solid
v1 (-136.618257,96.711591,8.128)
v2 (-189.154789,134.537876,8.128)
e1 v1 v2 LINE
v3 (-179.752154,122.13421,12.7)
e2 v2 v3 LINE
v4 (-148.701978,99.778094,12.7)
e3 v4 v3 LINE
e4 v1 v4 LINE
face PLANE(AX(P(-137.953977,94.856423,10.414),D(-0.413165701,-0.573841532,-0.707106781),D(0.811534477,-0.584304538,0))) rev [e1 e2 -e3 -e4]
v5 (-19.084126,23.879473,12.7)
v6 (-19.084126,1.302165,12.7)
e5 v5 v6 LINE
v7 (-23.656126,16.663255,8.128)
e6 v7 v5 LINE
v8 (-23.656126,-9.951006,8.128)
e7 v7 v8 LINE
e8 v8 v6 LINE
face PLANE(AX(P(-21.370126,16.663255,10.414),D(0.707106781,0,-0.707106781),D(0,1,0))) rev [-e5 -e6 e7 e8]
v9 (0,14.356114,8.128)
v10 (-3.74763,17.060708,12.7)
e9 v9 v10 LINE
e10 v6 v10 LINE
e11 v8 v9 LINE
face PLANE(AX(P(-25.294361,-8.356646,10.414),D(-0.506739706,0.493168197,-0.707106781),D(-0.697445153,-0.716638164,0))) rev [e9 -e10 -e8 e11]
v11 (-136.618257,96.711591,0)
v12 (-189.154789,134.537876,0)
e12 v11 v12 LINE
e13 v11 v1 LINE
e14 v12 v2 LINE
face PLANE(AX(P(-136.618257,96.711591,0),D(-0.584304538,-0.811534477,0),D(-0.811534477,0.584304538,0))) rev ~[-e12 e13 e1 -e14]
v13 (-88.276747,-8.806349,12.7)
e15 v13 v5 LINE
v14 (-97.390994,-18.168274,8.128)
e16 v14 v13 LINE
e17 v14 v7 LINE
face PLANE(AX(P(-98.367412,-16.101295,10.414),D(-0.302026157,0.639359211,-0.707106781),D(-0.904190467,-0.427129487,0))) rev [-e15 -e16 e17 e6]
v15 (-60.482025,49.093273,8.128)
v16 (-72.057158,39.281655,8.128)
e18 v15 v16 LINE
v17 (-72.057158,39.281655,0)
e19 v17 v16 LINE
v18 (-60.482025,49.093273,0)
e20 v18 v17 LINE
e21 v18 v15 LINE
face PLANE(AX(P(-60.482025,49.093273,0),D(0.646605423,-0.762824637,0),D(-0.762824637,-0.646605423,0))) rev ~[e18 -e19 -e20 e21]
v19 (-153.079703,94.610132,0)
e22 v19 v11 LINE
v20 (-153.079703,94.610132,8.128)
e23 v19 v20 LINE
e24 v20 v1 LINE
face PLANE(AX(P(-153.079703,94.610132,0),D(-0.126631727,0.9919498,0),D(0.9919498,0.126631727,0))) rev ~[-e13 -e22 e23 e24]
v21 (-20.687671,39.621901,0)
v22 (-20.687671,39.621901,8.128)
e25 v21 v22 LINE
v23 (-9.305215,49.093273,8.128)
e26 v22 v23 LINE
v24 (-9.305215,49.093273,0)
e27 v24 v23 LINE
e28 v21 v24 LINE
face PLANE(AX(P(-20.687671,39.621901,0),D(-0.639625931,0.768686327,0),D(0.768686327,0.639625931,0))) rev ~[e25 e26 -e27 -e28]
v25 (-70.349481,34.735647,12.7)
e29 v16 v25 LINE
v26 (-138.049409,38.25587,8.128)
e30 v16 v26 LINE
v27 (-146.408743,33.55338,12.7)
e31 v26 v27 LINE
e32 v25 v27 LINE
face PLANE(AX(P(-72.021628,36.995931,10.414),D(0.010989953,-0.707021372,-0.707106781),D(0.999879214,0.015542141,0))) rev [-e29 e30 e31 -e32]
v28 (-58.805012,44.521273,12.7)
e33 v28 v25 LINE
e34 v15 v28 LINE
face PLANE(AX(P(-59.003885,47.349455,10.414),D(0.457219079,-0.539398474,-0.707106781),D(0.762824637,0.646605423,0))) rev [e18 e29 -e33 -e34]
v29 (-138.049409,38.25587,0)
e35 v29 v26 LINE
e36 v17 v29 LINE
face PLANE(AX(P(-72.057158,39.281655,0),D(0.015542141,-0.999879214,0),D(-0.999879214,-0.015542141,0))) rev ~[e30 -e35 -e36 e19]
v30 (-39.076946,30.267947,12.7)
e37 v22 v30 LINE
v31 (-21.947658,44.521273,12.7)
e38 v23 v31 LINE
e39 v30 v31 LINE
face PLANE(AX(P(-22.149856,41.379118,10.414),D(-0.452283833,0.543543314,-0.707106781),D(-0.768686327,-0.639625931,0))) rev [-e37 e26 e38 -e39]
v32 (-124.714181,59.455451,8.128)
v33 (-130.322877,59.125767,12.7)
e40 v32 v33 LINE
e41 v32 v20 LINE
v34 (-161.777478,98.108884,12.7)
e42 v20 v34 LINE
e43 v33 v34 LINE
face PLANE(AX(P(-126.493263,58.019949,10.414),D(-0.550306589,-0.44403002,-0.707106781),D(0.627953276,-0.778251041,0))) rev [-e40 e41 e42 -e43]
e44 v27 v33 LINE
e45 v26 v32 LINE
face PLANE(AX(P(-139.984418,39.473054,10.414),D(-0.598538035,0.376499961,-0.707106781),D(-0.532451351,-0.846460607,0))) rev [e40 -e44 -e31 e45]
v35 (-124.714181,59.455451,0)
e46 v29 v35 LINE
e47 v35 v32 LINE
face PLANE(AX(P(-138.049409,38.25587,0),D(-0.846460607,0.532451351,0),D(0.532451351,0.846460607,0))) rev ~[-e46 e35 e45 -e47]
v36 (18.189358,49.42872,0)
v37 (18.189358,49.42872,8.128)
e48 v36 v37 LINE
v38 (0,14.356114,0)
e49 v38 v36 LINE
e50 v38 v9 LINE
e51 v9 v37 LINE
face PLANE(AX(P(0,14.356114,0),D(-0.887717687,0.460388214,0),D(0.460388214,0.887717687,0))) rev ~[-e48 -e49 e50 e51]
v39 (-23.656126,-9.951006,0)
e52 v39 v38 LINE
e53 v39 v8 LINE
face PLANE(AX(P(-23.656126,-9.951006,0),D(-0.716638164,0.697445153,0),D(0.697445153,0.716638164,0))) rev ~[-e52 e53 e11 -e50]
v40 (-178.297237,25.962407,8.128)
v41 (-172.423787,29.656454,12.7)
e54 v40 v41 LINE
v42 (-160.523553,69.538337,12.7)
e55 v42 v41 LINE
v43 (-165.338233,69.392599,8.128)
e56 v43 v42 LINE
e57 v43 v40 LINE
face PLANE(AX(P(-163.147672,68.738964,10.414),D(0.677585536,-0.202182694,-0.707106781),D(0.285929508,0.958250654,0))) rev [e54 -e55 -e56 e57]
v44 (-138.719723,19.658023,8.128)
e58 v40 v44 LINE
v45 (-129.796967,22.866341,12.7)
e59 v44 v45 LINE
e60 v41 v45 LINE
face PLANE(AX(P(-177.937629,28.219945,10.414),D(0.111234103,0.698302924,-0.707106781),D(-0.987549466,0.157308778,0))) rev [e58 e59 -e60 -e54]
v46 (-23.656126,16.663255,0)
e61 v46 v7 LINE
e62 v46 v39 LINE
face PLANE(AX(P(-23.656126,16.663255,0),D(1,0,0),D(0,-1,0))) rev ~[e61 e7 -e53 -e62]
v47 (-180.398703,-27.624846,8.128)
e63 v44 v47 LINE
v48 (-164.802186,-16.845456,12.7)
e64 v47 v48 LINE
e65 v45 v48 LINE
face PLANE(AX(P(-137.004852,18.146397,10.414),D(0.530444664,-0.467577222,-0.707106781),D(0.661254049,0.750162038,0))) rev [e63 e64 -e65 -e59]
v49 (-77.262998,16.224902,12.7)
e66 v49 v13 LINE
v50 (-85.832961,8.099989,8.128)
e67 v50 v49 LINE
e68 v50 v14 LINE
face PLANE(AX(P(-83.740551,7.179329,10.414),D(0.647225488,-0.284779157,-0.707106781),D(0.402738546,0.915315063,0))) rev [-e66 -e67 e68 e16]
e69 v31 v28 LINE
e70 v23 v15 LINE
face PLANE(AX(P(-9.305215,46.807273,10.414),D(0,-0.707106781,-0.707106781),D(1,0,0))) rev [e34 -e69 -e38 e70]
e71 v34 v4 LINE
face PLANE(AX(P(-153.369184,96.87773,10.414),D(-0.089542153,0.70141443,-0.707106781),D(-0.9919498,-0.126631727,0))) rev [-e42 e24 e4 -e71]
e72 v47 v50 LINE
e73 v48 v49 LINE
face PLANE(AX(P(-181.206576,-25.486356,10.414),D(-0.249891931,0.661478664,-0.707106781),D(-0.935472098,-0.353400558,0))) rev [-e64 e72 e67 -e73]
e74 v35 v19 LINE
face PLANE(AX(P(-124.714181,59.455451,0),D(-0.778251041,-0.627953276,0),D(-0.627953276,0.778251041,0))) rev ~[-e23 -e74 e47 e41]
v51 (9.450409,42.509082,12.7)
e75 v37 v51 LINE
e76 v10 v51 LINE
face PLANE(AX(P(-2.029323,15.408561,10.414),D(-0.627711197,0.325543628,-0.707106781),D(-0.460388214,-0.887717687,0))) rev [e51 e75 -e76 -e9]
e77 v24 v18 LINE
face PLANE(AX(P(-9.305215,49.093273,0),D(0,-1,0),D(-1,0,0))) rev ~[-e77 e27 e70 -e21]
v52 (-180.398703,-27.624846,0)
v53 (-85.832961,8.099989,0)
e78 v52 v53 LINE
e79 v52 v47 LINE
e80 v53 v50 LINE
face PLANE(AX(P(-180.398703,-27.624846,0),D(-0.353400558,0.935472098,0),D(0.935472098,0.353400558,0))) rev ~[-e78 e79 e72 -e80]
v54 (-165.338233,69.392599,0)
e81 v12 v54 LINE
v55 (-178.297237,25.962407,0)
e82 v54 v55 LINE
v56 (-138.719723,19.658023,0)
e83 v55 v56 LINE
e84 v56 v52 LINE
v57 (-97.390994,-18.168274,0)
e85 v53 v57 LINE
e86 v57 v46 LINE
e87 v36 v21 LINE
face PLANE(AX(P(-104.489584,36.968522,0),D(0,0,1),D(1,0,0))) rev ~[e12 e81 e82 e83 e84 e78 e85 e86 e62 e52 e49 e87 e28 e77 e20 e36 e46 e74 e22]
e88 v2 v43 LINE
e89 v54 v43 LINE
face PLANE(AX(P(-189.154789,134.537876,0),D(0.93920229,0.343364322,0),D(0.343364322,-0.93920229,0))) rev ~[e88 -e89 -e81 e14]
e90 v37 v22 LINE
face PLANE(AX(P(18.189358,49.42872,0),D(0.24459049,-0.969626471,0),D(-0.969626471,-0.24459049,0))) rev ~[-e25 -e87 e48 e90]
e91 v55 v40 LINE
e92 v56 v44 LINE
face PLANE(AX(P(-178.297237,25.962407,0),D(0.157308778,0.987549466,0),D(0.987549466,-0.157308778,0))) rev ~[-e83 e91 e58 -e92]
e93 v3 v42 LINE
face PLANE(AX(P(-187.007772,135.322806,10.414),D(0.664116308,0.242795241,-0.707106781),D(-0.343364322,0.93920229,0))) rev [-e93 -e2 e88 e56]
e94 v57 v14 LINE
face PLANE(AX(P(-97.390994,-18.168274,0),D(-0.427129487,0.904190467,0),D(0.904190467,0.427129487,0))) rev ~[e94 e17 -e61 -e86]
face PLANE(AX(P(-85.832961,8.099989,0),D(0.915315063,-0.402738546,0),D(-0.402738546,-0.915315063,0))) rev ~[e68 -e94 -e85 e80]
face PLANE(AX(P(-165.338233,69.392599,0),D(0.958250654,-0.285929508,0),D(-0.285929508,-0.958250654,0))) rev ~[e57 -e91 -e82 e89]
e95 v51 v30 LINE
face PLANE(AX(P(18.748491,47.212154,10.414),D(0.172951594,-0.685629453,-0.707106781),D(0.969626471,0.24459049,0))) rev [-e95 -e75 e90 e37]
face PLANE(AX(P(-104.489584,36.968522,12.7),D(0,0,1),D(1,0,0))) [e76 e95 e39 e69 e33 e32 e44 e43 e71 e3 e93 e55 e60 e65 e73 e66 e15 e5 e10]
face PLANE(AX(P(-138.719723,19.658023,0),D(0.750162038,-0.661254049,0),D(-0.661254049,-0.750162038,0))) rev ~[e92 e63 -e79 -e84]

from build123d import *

# Parameters (mm, degrees)
F1_DEPTH = 12.7
F2_SIZE  = 4.572


# Not quite as in the source:
# - a feature names something its author has since deleted; it is built from what else it names


with BuildPart() as f1:
    # F0 (on Top) → F1 (new body)
    with BuildSketch(Plane.XY):
        Polygon((-138.7197226286, 19.6580234915), (-180.3987026215, -27.6248455048), (-85.8329609036, 8.0999890342), (-97.3909944296, -18.1682743132), (-23.6561261117, 16.663254671), (-23.6561261117, -9.9510056898), (0, 14.3561139703), (18.1893575937, 49.4287200272), (-20.6876713783, 39.6219007671), (-9.3052154407, 49.093272537), (-60.4820251465, 49.093272537), (-72.0571577549, 39.281655103), (-138.0494087934, 38.2558703423), (-124.7141808271, 59.4554506242), (-153.0797034502, 94.610132277), (-136.6182565689, 96.7115908861), (-189.1547888517, 134.5378756523), (-165.3382331133, 69.3925991654), (-178.2972365618, 25.9624067694), align=None)
    extrude(amount=F1_DEPTH)

    # F2
    f2_edges = [f1.edges().sort_by_distance(p)[0] for p in [
        (-162.886523, 115.624733, 12.7),
        (-177.246511, 101.965237, 12.7),
        (-171.817735, 47.677503, 12.7),
        (-158.50848, 22.810215, 12.7),
        (-159.559213, -3.983411, 12.7),
        (-133.115832, -9.762428, 12.7),
        (-91.611978, -5.034143, 12.7),
        (-60.52356, -0.75251, 12.7),
        (-23.656126, 3.356124, 12.7),
        (-11.828063, 2.202554, 12.7),
        (9.094679, 31.892417, 12.7),
        (-1.249157, 44.52531, 12.7),
        (-14.996443, 44.357587, 12.7),
        (-34.89362, 49.093273, 12.7),
        (-66.269591, 44.187464, 12.7),
        (-105.053283, 38.768763, 12.7),
        (-131.381795, 48.85566, 12.7),
        (-138.896942, 77.032791, 12.7),
        (-144.84898, 95.660862, 12.7),
    ]]
    chamfer(f2_edges, length=F2_SIZE)


solid = f1.part
